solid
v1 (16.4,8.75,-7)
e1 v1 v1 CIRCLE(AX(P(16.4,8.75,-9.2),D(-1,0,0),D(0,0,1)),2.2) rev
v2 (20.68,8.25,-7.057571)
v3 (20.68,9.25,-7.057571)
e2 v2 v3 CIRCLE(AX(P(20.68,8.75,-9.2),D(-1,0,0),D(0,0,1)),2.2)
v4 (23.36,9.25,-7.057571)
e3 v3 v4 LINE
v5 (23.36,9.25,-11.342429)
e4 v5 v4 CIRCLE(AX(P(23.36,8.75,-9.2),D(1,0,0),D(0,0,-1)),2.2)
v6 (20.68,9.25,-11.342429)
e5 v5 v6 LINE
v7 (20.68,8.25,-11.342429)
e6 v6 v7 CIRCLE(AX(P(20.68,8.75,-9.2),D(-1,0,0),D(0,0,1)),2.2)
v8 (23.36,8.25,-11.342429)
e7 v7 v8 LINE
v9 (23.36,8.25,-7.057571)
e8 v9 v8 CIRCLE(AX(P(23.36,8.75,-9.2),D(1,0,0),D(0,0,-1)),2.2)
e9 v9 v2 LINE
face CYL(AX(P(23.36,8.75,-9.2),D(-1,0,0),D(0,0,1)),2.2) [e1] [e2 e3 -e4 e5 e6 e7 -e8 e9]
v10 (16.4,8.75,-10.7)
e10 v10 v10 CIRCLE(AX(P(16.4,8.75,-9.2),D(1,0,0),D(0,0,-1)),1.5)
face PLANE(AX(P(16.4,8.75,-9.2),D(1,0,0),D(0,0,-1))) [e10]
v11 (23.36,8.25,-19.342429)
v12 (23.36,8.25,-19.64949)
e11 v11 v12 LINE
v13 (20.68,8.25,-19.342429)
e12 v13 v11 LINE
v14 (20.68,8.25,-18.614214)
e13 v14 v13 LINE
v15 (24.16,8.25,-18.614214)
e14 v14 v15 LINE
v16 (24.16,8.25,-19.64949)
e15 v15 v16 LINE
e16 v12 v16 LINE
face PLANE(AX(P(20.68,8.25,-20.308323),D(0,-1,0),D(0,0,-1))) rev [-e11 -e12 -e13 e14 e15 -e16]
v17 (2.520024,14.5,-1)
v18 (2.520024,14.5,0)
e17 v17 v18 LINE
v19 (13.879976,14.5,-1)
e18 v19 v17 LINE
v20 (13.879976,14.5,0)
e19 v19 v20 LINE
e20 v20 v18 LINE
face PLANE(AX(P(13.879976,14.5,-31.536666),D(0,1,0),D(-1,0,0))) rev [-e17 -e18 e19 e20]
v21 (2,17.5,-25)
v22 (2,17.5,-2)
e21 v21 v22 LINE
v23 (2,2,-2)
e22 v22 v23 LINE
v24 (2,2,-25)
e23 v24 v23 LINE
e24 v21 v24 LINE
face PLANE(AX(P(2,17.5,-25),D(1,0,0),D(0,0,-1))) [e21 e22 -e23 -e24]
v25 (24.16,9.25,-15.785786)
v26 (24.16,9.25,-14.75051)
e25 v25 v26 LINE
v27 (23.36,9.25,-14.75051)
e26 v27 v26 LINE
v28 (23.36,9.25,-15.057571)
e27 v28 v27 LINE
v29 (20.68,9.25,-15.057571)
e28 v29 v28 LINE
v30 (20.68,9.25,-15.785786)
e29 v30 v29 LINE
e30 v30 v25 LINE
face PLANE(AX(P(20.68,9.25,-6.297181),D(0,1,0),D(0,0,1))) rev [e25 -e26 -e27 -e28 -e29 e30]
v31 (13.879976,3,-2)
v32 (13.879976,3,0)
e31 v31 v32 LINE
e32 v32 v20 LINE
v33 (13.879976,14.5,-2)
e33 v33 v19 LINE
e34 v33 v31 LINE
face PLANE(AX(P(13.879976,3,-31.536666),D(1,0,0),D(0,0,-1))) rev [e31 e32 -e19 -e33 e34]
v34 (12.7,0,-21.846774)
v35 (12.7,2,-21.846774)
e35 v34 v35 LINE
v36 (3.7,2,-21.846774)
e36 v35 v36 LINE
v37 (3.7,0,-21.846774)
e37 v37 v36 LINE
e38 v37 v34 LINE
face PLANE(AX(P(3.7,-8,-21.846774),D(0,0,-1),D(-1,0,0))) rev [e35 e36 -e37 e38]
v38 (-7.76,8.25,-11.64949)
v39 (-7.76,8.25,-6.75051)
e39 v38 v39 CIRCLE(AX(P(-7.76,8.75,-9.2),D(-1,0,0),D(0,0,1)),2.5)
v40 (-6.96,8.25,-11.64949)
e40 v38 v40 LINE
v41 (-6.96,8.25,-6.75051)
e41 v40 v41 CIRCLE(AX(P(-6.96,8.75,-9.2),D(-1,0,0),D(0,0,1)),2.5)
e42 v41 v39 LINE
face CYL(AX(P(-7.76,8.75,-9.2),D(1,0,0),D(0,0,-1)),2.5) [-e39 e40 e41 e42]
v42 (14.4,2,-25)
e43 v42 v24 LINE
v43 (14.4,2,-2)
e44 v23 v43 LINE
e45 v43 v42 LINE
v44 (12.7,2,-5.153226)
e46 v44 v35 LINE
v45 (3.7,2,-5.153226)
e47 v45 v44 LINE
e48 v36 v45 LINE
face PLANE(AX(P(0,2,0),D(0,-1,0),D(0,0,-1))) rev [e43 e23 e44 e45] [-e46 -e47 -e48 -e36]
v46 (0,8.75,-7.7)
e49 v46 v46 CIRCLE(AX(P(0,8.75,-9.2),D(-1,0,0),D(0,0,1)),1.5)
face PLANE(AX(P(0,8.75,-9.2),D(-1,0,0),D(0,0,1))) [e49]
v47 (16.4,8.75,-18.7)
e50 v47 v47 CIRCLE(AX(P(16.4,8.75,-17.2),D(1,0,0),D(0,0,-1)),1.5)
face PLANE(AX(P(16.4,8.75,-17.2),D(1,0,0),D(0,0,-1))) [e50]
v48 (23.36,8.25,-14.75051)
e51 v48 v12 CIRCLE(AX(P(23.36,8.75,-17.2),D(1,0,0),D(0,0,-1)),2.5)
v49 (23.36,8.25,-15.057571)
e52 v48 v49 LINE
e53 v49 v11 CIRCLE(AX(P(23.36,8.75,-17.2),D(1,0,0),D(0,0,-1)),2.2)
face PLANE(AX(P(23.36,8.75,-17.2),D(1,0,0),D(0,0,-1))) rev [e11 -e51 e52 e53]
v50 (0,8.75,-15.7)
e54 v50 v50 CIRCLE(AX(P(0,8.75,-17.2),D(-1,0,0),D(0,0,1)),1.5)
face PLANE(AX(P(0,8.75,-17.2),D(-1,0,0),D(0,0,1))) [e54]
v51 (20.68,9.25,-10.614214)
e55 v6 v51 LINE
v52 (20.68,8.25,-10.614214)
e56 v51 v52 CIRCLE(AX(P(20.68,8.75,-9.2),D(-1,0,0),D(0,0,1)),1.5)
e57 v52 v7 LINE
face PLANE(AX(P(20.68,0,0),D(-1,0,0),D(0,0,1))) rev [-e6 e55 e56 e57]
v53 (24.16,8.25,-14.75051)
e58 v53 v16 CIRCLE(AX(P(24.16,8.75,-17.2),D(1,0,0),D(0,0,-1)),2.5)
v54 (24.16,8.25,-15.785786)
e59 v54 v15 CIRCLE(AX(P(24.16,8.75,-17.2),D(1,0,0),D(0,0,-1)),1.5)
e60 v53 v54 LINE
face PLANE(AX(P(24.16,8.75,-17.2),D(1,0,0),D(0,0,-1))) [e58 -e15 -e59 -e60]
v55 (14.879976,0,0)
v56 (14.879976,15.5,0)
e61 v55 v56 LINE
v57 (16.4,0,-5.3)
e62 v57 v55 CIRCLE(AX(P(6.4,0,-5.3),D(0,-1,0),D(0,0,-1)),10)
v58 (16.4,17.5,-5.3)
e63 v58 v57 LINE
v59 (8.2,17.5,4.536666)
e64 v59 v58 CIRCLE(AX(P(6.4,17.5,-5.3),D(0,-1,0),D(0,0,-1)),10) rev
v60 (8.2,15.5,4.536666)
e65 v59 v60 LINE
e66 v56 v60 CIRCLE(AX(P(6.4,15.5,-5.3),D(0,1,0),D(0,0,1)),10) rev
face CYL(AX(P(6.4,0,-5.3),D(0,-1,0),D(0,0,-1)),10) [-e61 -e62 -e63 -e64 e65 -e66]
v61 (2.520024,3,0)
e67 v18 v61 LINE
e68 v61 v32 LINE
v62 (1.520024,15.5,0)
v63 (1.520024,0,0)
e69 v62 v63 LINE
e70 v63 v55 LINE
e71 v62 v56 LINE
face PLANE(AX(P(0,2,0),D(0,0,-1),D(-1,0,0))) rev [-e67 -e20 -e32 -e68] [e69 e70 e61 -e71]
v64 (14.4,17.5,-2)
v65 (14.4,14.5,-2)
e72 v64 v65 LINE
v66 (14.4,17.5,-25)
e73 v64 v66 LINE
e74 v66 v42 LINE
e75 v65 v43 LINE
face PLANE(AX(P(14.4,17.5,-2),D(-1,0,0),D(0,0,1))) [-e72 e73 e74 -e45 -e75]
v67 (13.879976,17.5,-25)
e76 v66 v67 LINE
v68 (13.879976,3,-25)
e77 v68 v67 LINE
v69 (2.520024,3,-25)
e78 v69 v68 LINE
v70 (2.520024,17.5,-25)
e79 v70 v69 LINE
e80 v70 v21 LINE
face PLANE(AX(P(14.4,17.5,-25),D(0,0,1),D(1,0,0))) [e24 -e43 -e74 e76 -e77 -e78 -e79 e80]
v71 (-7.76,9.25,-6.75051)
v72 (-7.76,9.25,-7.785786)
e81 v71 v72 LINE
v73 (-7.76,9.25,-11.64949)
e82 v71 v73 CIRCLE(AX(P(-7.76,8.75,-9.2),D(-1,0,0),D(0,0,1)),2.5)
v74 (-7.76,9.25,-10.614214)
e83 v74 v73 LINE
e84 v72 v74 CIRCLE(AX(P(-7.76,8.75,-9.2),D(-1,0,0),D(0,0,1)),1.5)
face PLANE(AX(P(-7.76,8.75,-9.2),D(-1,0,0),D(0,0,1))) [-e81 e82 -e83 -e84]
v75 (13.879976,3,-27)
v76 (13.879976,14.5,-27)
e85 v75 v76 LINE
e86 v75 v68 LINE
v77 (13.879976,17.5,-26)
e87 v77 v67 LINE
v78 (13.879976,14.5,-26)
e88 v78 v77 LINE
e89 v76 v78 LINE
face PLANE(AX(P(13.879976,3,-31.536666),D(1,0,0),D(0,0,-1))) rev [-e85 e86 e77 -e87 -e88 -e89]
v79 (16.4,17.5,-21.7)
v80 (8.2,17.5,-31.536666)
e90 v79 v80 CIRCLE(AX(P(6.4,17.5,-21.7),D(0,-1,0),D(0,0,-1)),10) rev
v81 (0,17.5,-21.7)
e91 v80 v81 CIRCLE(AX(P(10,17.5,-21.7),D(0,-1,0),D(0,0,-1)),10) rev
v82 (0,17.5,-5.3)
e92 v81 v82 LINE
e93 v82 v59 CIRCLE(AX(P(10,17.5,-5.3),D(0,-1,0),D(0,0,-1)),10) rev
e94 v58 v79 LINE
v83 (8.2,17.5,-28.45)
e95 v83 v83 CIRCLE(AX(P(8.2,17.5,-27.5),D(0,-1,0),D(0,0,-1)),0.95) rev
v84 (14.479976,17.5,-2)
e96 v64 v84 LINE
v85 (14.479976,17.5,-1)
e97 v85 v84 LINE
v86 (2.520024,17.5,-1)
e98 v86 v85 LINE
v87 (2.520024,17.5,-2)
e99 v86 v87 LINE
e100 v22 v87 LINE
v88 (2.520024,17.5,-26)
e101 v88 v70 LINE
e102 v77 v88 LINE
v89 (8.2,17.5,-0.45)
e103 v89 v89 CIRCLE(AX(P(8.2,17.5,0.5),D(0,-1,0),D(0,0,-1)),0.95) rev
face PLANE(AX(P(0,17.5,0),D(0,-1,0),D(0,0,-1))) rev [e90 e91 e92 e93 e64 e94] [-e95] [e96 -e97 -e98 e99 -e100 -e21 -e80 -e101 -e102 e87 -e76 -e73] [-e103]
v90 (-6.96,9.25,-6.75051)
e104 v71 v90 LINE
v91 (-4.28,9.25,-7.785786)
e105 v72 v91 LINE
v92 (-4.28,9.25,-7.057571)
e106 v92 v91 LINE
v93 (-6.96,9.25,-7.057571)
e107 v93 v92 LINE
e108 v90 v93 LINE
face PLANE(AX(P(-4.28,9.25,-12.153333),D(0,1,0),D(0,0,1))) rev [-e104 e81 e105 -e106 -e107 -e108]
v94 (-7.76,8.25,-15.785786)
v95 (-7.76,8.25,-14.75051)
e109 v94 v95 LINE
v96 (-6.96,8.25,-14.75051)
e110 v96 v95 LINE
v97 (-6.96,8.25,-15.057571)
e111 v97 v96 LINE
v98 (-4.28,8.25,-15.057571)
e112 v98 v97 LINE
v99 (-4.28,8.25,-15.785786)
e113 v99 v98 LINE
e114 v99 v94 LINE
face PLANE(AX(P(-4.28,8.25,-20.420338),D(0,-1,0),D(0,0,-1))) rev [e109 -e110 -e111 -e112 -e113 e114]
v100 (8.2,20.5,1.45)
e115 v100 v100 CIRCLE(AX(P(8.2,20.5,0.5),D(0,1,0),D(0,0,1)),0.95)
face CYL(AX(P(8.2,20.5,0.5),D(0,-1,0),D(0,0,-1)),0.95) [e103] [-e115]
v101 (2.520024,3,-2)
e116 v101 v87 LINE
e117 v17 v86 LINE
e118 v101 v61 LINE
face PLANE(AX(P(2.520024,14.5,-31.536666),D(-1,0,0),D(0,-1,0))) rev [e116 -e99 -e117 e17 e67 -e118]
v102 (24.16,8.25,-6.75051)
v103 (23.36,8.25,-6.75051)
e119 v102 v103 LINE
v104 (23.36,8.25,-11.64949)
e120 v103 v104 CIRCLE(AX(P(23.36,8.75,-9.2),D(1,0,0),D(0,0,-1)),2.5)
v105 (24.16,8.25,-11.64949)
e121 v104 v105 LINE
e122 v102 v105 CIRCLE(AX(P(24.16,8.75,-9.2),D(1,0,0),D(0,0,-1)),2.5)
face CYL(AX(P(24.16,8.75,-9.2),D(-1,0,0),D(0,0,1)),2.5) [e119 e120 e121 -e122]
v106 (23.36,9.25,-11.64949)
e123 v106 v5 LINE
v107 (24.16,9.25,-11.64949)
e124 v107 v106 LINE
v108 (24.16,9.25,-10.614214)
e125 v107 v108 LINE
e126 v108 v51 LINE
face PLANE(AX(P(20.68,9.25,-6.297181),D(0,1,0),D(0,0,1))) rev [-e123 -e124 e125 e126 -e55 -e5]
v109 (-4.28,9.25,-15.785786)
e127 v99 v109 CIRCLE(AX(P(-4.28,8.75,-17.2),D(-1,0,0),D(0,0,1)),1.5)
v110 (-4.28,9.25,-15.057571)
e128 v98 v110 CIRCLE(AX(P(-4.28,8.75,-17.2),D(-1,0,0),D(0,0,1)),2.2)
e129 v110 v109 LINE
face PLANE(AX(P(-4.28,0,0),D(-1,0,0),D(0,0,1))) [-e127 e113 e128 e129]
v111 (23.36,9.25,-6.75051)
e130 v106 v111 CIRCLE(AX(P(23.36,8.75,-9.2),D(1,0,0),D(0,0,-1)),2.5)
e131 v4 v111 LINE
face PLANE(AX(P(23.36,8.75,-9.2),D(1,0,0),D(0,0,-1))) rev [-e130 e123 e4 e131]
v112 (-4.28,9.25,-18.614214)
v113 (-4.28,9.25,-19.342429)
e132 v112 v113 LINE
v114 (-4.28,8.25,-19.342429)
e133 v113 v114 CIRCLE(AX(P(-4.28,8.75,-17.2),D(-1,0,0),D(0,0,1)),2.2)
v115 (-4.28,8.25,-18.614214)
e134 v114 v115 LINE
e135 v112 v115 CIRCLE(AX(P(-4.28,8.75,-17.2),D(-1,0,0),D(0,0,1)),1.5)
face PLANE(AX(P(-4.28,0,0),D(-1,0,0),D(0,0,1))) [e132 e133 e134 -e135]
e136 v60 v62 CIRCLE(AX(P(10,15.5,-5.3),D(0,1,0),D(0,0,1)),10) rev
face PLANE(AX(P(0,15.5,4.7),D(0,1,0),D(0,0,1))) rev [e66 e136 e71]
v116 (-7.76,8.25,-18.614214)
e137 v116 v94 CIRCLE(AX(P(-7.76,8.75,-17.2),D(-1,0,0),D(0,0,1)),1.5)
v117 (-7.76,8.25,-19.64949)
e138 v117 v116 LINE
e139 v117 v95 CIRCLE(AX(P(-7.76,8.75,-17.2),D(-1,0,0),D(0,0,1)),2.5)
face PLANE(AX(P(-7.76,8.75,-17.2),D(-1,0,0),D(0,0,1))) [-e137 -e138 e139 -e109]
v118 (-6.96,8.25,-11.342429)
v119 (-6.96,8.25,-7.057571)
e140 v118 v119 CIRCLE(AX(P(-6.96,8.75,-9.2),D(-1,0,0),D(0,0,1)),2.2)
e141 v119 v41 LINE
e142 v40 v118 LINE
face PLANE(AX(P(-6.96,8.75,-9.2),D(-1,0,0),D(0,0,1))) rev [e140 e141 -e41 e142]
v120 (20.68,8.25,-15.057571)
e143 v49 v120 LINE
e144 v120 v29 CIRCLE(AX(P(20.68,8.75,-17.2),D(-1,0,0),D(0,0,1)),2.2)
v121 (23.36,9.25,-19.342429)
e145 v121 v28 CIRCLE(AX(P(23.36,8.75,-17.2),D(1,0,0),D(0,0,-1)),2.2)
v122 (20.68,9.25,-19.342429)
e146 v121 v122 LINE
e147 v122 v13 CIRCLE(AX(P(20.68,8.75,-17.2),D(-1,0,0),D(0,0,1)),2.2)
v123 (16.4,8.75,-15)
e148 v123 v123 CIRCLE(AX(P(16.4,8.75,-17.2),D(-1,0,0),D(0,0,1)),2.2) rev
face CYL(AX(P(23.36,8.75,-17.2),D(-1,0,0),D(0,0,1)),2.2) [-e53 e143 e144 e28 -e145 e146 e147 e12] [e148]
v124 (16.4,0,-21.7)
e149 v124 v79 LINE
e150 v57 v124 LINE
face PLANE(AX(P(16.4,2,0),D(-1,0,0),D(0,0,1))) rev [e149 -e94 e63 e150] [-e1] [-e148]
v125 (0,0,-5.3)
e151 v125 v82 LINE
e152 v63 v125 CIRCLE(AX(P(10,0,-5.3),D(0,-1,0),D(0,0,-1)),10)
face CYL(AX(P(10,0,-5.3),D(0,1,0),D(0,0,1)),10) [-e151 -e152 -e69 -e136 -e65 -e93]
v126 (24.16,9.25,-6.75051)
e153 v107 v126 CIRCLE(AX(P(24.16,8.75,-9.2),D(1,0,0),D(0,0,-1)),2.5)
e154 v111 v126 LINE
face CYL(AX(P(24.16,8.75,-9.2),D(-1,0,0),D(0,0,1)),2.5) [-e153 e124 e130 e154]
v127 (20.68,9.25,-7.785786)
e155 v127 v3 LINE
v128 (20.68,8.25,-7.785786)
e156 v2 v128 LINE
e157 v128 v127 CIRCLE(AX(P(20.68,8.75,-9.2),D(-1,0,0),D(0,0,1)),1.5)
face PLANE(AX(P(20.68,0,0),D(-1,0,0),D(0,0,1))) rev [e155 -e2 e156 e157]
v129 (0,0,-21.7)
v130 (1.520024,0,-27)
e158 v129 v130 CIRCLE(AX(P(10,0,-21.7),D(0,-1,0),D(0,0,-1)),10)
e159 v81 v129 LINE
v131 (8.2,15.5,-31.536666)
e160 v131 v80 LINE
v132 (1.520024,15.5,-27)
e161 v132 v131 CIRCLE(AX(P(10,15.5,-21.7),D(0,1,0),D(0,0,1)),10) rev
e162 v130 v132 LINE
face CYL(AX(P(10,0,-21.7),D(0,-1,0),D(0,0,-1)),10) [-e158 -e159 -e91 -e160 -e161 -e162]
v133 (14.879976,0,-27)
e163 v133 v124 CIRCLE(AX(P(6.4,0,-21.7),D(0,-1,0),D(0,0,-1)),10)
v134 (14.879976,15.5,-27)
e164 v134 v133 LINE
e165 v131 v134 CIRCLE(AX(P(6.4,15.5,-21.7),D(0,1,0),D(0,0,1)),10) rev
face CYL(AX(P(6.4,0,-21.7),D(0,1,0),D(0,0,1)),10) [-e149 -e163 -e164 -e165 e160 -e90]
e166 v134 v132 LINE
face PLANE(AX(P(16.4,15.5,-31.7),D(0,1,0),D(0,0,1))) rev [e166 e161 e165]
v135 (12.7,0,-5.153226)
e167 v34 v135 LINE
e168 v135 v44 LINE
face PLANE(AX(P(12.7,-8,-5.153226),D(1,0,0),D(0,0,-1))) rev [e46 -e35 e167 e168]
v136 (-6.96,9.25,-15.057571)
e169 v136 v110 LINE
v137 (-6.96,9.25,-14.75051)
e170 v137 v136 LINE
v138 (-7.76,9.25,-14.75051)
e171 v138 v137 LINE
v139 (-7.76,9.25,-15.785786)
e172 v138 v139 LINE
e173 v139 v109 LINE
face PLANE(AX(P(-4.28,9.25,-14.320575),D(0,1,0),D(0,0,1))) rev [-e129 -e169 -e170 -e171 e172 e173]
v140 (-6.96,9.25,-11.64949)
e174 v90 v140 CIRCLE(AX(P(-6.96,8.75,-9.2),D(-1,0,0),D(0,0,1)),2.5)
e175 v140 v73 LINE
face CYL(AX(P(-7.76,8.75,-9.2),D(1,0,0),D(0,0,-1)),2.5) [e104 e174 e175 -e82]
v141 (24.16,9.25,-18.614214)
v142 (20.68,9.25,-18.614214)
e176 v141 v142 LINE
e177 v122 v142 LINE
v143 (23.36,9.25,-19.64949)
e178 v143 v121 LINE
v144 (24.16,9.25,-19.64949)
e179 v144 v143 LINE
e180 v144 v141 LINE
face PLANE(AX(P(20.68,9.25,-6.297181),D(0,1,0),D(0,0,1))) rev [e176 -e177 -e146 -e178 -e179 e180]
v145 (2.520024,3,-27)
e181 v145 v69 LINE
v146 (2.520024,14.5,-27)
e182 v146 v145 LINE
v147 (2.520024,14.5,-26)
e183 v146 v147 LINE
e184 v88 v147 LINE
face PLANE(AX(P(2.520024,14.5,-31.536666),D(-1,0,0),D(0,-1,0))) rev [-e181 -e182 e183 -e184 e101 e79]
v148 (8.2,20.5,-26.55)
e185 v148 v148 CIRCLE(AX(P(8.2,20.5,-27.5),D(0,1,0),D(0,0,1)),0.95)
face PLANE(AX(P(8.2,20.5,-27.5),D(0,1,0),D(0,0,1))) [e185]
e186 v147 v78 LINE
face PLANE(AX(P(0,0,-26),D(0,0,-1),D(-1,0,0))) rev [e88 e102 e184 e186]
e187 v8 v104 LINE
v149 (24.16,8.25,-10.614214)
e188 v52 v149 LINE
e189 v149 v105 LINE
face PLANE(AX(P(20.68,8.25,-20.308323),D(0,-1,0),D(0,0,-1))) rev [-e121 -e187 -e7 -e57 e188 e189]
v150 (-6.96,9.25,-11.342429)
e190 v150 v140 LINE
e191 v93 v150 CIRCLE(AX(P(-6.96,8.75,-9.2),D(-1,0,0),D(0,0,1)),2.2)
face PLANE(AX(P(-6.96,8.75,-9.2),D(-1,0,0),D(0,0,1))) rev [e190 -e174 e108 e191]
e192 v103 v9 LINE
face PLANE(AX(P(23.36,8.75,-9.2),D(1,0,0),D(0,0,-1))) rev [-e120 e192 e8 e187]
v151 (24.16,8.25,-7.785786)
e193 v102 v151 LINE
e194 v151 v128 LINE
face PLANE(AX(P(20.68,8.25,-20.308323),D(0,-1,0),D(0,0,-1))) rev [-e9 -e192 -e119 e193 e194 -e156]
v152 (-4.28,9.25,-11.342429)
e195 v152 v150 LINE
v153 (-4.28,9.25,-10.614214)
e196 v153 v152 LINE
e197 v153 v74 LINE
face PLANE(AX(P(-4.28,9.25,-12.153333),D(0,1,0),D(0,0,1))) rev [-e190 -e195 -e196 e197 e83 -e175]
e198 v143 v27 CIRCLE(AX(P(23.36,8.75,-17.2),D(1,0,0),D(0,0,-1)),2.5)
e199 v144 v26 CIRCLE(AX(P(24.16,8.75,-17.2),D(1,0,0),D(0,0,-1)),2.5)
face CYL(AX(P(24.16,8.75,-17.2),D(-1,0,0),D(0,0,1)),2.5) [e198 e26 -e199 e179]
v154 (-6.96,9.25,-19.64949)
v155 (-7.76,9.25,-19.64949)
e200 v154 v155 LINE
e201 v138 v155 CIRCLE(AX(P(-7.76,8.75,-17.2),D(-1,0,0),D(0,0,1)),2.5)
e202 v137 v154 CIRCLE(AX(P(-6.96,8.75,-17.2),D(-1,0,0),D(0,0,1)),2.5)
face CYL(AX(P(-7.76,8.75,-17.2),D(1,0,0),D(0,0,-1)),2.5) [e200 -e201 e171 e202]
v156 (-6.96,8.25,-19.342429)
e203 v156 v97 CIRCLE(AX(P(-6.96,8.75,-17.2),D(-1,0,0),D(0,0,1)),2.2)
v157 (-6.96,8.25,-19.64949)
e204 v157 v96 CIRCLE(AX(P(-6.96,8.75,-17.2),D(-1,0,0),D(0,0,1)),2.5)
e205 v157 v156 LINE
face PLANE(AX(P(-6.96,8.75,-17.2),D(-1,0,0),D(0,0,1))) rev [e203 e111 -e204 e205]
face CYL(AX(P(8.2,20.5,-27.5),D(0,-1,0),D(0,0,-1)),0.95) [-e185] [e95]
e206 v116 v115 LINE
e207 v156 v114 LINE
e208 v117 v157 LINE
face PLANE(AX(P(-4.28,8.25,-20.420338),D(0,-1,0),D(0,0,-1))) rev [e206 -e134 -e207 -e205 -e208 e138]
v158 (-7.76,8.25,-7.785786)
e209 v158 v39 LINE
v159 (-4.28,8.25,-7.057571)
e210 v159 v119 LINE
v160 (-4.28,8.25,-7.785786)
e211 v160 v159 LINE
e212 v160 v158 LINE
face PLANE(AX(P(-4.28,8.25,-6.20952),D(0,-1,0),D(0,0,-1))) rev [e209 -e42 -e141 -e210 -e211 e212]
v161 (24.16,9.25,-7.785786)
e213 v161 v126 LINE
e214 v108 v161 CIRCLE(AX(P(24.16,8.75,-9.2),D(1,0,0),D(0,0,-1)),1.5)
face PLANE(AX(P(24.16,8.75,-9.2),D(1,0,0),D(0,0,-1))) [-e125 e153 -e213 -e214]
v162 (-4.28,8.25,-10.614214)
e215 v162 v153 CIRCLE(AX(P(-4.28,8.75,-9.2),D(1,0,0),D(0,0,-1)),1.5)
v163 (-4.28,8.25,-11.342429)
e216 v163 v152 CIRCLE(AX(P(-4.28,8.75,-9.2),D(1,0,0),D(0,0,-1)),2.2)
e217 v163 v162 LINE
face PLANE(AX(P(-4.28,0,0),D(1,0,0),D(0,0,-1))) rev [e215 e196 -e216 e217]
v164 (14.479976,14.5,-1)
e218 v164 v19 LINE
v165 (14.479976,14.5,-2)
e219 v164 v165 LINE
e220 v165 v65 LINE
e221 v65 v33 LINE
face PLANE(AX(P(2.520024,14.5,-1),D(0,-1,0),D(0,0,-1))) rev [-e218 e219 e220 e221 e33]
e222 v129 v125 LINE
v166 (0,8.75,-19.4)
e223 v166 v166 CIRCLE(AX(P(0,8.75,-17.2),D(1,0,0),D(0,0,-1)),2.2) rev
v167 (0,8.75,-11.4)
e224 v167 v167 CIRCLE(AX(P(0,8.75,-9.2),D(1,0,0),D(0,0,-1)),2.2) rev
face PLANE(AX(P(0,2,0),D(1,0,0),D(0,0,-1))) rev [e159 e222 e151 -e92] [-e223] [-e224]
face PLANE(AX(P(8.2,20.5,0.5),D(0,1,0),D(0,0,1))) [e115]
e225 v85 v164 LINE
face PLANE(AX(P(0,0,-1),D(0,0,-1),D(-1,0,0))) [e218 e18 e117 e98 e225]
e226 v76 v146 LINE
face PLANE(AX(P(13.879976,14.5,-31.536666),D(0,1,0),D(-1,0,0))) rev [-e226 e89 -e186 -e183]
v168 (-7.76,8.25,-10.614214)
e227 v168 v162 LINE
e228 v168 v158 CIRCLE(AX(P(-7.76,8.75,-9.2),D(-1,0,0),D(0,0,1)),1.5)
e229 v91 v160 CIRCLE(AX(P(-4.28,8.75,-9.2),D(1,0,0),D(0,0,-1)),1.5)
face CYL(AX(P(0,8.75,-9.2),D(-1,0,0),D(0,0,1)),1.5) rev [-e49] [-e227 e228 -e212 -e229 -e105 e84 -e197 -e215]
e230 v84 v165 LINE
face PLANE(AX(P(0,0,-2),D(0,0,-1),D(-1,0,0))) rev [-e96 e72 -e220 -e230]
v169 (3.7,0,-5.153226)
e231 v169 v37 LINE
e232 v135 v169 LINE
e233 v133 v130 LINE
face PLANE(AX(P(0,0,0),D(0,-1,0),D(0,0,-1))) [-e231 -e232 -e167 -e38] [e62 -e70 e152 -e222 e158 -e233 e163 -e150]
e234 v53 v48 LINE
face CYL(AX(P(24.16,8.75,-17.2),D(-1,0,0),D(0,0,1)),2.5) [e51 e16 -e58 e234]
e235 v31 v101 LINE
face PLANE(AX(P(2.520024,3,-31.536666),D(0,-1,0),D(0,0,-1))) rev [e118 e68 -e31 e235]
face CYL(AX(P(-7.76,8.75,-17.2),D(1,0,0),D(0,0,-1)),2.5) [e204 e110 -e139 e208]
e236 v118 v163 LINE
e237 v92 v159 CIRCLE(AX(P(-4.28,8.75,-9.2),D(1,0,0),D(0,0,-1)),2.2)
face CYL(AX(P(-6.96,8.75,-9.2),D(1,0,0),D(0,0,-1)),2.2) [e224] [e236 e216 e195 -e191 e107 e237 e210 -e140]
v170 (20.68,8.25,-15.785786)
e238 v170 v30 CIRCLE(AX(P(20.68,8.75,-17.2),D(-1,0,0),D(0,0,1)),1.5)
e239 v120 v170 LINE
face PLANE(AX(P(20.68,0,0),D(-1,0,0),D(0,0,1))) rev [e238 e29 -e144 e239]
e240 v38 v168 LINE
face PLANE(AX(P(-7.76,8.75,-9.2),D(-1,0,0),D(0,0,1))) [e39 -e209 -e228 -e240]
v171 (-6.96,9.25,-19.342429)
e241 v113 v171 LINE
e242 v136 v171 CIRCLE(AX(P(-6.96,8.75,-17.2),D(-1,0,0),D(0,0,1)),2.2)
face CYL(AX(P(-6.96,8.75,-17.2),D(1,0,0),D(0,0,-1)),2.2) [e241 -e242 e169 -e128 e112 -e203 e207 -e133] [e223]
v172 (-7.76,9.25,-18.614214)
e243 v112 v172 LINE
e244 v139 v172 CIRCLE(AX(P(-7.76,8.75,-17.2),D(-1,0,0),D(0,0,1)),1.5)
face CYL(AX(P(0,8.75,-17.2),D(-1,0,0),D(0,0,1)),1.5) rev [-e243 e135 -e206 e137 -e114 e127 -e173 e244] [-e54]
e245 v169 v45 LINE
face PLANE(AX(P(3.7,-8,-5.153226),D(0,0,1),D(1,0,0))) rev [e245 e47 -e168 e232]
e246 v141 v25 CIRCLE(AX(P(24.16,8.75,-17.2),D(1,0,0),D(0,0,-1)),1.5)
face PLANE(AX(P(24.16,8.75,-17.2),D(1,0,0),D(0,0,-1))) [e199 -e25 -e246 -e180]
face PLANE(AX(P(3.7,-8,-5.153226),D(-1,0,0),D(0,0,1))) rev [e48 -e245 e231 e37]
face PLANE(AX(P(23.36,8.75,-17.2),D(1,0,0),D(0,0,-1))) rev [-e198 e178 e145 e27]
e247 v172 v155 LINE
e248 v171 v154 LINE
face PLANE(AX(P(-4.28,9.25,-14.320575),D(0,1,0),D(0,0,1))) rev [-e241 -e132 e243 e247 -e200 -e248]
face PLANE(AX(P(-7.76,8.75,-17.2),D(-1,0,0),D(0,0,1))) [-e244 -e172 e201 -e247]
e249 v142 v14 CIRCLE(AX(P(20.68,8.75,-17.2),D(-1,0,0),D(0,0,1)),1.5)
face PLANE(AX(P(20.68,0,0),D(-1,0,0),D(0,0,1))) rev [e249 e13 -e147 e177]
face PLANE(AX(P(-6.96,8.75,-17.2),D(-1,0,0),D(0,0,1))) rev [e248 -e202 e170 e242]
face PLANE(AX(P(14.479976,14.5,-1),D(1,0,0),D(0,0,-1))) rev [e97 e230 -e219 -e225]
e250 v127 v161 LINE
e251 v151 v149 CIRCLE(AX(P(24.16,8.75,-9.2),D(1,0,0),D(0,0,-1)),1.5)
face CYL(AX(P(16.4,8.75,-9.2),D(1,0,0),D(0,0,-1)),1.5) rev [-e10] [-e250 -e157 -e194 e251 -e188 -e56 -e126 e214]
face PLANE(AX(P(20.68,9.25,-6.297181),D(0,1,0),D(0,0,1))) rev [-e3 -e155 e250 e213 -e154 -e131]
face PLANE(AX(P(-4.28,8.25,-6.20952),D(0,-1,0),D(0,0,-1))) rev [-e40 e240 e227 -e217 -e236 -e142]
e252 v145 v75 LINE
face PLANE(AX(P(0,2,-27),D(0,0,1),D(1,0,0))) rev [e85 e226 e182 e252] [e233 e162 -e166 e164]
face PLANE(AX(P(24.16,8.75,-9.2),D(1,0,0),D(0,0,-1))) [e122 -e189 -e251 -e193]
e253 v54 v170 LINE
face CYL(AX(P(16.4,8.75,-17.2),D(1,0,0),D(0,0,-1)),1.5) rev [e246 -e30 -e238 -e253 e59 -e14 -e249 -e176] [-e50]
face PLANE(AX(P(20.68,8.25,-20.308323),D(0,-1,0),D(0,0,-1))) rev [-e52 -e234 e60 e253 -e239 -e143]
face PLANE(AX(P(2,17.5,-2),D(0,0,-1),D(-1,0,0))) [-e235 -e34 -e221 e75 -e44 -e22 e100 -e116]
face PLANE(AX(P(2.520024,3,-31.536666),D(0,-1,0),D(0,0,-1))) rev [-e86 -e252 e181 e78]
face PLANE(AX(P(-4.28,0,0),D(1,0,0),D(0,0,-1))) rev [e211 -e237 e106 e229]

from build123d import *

# Parameters (mm, degrees)
SKETCH1_W           = 16.4
SKETCH1_H           = 27
BOSS_EXTRUDE1_DEPTH = 2
SKETCH5_W           = 16.4
SKETCH5_H           = 27
SKETCH5_W_2         = 12.4
SKETCH5_H_2         = 23
BOSS_EXTRUDE2_DEPTH = 15.5
SKETCH6_W           = 16.4
SKETCH6_H           = 2
BOSS_EXTRUDE3_DEPTH = 4.7
SKETCH7_W           = 16.4
SKETCH7_H           = 2
BOSS_EXTRUDE4_DEPTH = 4.7
SKETCH8_R           = 0.95
BOSS_EXTRUDE5_DEPTH = 3
FILLET1_R           = 10
SKETCH9_R           = 2.2
BOSS_EXTRUDE6_DEPTH = 6.96
BOSS_EXTRUDE7_START = 6.96
SKETCH10_R          = 2.2
BOSS_EXTRUDE7_DEPTH = 6.96
SKETCH11_W          = 11.35995283
SKETCH11_H          = 11.5
CUT_EXTRUDE1_DEPTH  = 45.277544069
SKETCH12_W          = 9
SKETCH12_H          = 16.693548388
CUT_EXTRUDE2_DEPTH  = 10
SKETCH14_W          = 11.35995283
SKETCH14_H          = 3
CUT_EXTRUDE5_DEPTH  = 1
SKETCH15_W          = 11.95995283
SKETCH15_H          = 3
CUT_EXTRUDE6_DEPTH  = 1
SKETCH16_R          = 2.5
BOSS_EXTRUDE8_DEPTH = 0.8
BOSS_EXTRUDE9_START = 0.8
SKETCH17_R          = 2.5
BOSS_EXTRUDE9_DEPTH = 0.8
SKETCH18_W          = 6.099763115
SKETCH18_H          = 1
CUT_EXTRUDE7_DEPTH  = 3.48
CUT_EXTRUDE8_DEPTH  = 3.48
SKETCH20_R          = 1.5
CUT_EXTRUDE9_DEPTH  = 7.76
CUT_EXTRUDE10_START = -7.76
SKETCH21_R          = 1.5
CUT_EXTRUDE10_DEPTH = 7.76


with BuildPart() as part:
    # Sketch1 → Boss-Extrude1 (new body)
    with BuildSketch(Plane(origin=(0, 0, 0), x_dir=(1, 0, 0), z_dir=(0, 1, 0))):
        with Locations((8.2, 13.5)):
            Rectangle(SKETCH1_W, SKETCH1_H)
    extrude(amount=BOSS_EXTRUDE1_DEPTH)

    # Sketch5 → Boss-Extrude2 (add)
    with BuildSketch(Plane(origin=(0, 2, 0), x_dir=(1, 0, 0), z_dir=(0, 1, 0))):
        with Locations((8.2, 13.5)):
            Rectangle(SKETCH5_W, SKETCH5_H)
        with Locations((8.2, 13.5)):
            Rectangle(SKETCH5_W_2, SKETCH5_H_2, mode=Mode.SUBTRACT)
    extrude(amount=BOSS_EXTRUDE2_DEPTH)

    # Sketch6 → Boss-Extrude3 (add)
    with BuildSketch(Plane(origin=(0, 0, -27), x_dir=(-1, 0, 0), z_dir=(0, 0, -1))):
        with Locations((-8.2, 16.5)):
            Rectangle(SKETCH6_W, SKETCH6_H)
    extrude(amount=BOSS_EXTRUDE3_DEPTH)

    # Sketch7 → Boss-Extrude4 (add)
    with BuildSketch(Plane.XY):
        with Locations((8.2, 16.5)):
            Rectangle(SKETCH7_W, SKETCH7_H)
    extrude(amount=BOSS_EXTRUDE4_DEPTH)

    # Sketch8 → Boss-Extrude5 (add)
    with BuildSketch(Plane(origin=(0, 17.5, 0), x_dir=(1, 0, 0), z_dir=(0, 1, 0))):
        with Locations(Location((8.2, 27.5, 0), (0, 0, 90))):
            Circle(SKETCH8_R)
        with Locations(Location((8.2, -0.5, 0), (0, 0, 90))):
            Circle(SKETCH8_R)
    extrude(amount=BOSS_EXTRUDE5_DEPTH)

    # Fillet1
    # the kernel refuses this fillet: 10 mm, written as the material it takes off along each edge
    with BuildSketch(Plane(origin=(16.4, -9.5, -31.7), x_dir=(0, 0, 1), z_dir=(0, 1, 0)), Plane(origin=(0, 42.5, -31.7), x_dir=(0, 0, 1), z_dir=(0, -1, 0)), Plane(origin=(16.4, 42.5, 4.7), x_dir=(0, 0, -1), z_dir=(0, -1, 0)), Plane(origin=(0, -9.5, 4.7), x_dir=(0, 0, -1), z_dir=(0, 1, 0))) as fillet1_piece_1:
        with BuildLine():
            CenterArc((FILLET1_R, -FILLET1_R), FILLET1_R, 90, 90)
            Line((0, -FILLET1_R), (0, 0))
            Line((0, 0), (FILLET1_R, 0))
        make_face()
    extrude(amount=52, mode=Mode.SUBTRACT)

    # Sketch9 → Boss-Extrude6 (add)
    with BuildSketch(Plane.ZY):
        with Locations(Location((-17.2, 8.75, 0), (0, 0, 180))):
            Circle(SKETCH9_R)
        with Locations(Location((-9.2, 8.75, 0), (0, 0, 180))):
            Circle(SKETCH9_R)
    extrude(amount=BOSS_EXTRUDE6_DEPTH)

    # Sketch10 → Boss-Extrude7 (add)
    with BuildSketch(Plane(origin=(16.4, 0, 0), x_dir=(0, 0, -1), z_dir=(1, 0, 0)).offset(BOSS_EXTRUDE7_START)):
        with Locations((9.2, 8.75)):
            Circle(SKETCH10_R)
        with Locations((17.2, 8.75)):
            Circle(SKETCH10_R)
    extrude(amount=-BOSS_EXTRUDE7_DEPTH)

    # Sketch11 → Cut-Extrude1 (cut, through all)
    with BuildSketch(Plane.XY):
        with Locations((8.2, 8.75)):
            Rectangle(SKETCH11_W, SKETCH11_H)
    extrude(amount=-CUT_EXTRUDE1_DEPTH, mode=Mode.SUBTRACT)

    # Sketch12 → Cut-Extrude2 (cut)
    with BuildSketch(Plane(origin=(0, 2, 0), x_dir=(1, 0, 0), z_dir=(0, 1, 0))):
        with Locations((8.2, 13.5)):
            Rectangle(SKETCH12_W, SKETCH12_H)
    extrude(amount=-CUT_EXTRUDE2_DEPTH, mode=Mode.SUBTRACT)

    # Sketch14 → Cut-Extrude5 (cut)
    with BuildSketch(Plane.XY.offset(-25)):
        with Locations((8.2, 16)):
            Rectangle(SKETCH14_W, SKETCH14_H)
    extrude(amount=-CUT_EXTRUDE5_DEPTH, mode=Mode.SUBTRACT)

    # Sketch15 → Cut-Extrude6 (cut)
    with BuildSketch(Plane(origin=(0, 0, -2), x_dir=(-1, 0, 0), z_dir=(0, 0, -1))):
        with Locations((-8.5, 16)):
            Rectangle(SKETCH15_W, SKETCH15_H)
    extrude(amount=-CUT_EXTRUDE6_DEPTH, mode=Mode.SUBTRACT)

    # Sketch16 → Boss-Extrude8 (add)
    with BuildSketch(Plane(origin=(23.36, 0, 0), x_dir=(0, 0, -1), z_dir=(1, 0, 0))):
        with Locations((9.2, 8.75)):
            Circle(SKETCH16_R)
        with Locations((17.2, 8.75)):
            Circle(SKETCH16_R)
    extrude(amount=BOSS_EXTRUDE8_DEPTH)

    # Sketch17 → Boss-Extrude9 (add)
    with BuildSketch(Plane.ZY.offset(6.96).offset(BOSS_EXTRUDE9_START)):
        with Locations(Location((-9.2, 8.75, 0), (0, 0, 180))):
            Circle(SKETCH17_R)
        with Locations(Location((-17.2, 8.75, 0), (0, 0, 180))):
            Circle(SKETCH17_R)
    extrude(amount=-BOSS_EXTRUDE9_DEPTH)

    # Sketch18 → Cut-Extrude7 (cut)
    with BuildSketch(Plane.ZY.offset(7.76)):
        with Locations((-17.37045616, 8.75)):
            Rectangle(SKETCH18_W, SKETCH18_H)
        Polygon((-6.209519779, 8.75), (-6.209519779, 8.25), (-12.153333116, 8.25), (-12.153333116, 9.25), (-6.209519779, 9.25), align=None)
    extrude(amount=-CUT_EXTRUDE7_DEPTH, mode=Mode.SUBTRACT)

    # Sketch19 → Cut-Extrude8 (cut)
    with BuildSketch(Plane(origin=(24.16, 0, 0), x_dir=(0, 0, -1), z_dir=(1, 0, 0))):
        Polygon((6.297180826, 8.75), (6.297180826, 9.25), (20.308323275, 9.25), (20.308323275, 8.25), (6.297180826, 8.25), align=None)
    extrude(amount=-CUT_EXTRUDE8_DEPTH, mode=Mode.SUBTRACT)

    # Sketch20 → Cut-Extrude9 (cut)
    with BuildSketch(Plane(origin=(24.16, 0, 0), x_dir=(0, 0, -1), z_dir=(1, 0, 0))):
        with Locations((9.2, 8.75)):
            Circle(SKETCH20_R)
        with Locations((17.2, 8.75)):
            Circle(SKETCH20_R)
    extrude(amount=-CUT_EXTRUDE9_DEPTH, mode=Mode.SUBTRACT)

    # Sketch21 → Cut-Extrude10 (cut)
    with BuildSketch(Plane.ZY.offset(7.76).offset(CUT_EXTRUDE10_START)):
        with Locations(Location((-9.2, 8.75, 0), (0, 0, 180))):
            Circle(SKETCH21_R)
        with Locations(Location((-17.2, 8.75, 0), (0, 0, 180))):
            Circle(SKETCH21_R)
    extrude(amount=CUT_EXTRUDE10_DEPTH, mode=Mode.SUBTRACT)


solid = part.part
